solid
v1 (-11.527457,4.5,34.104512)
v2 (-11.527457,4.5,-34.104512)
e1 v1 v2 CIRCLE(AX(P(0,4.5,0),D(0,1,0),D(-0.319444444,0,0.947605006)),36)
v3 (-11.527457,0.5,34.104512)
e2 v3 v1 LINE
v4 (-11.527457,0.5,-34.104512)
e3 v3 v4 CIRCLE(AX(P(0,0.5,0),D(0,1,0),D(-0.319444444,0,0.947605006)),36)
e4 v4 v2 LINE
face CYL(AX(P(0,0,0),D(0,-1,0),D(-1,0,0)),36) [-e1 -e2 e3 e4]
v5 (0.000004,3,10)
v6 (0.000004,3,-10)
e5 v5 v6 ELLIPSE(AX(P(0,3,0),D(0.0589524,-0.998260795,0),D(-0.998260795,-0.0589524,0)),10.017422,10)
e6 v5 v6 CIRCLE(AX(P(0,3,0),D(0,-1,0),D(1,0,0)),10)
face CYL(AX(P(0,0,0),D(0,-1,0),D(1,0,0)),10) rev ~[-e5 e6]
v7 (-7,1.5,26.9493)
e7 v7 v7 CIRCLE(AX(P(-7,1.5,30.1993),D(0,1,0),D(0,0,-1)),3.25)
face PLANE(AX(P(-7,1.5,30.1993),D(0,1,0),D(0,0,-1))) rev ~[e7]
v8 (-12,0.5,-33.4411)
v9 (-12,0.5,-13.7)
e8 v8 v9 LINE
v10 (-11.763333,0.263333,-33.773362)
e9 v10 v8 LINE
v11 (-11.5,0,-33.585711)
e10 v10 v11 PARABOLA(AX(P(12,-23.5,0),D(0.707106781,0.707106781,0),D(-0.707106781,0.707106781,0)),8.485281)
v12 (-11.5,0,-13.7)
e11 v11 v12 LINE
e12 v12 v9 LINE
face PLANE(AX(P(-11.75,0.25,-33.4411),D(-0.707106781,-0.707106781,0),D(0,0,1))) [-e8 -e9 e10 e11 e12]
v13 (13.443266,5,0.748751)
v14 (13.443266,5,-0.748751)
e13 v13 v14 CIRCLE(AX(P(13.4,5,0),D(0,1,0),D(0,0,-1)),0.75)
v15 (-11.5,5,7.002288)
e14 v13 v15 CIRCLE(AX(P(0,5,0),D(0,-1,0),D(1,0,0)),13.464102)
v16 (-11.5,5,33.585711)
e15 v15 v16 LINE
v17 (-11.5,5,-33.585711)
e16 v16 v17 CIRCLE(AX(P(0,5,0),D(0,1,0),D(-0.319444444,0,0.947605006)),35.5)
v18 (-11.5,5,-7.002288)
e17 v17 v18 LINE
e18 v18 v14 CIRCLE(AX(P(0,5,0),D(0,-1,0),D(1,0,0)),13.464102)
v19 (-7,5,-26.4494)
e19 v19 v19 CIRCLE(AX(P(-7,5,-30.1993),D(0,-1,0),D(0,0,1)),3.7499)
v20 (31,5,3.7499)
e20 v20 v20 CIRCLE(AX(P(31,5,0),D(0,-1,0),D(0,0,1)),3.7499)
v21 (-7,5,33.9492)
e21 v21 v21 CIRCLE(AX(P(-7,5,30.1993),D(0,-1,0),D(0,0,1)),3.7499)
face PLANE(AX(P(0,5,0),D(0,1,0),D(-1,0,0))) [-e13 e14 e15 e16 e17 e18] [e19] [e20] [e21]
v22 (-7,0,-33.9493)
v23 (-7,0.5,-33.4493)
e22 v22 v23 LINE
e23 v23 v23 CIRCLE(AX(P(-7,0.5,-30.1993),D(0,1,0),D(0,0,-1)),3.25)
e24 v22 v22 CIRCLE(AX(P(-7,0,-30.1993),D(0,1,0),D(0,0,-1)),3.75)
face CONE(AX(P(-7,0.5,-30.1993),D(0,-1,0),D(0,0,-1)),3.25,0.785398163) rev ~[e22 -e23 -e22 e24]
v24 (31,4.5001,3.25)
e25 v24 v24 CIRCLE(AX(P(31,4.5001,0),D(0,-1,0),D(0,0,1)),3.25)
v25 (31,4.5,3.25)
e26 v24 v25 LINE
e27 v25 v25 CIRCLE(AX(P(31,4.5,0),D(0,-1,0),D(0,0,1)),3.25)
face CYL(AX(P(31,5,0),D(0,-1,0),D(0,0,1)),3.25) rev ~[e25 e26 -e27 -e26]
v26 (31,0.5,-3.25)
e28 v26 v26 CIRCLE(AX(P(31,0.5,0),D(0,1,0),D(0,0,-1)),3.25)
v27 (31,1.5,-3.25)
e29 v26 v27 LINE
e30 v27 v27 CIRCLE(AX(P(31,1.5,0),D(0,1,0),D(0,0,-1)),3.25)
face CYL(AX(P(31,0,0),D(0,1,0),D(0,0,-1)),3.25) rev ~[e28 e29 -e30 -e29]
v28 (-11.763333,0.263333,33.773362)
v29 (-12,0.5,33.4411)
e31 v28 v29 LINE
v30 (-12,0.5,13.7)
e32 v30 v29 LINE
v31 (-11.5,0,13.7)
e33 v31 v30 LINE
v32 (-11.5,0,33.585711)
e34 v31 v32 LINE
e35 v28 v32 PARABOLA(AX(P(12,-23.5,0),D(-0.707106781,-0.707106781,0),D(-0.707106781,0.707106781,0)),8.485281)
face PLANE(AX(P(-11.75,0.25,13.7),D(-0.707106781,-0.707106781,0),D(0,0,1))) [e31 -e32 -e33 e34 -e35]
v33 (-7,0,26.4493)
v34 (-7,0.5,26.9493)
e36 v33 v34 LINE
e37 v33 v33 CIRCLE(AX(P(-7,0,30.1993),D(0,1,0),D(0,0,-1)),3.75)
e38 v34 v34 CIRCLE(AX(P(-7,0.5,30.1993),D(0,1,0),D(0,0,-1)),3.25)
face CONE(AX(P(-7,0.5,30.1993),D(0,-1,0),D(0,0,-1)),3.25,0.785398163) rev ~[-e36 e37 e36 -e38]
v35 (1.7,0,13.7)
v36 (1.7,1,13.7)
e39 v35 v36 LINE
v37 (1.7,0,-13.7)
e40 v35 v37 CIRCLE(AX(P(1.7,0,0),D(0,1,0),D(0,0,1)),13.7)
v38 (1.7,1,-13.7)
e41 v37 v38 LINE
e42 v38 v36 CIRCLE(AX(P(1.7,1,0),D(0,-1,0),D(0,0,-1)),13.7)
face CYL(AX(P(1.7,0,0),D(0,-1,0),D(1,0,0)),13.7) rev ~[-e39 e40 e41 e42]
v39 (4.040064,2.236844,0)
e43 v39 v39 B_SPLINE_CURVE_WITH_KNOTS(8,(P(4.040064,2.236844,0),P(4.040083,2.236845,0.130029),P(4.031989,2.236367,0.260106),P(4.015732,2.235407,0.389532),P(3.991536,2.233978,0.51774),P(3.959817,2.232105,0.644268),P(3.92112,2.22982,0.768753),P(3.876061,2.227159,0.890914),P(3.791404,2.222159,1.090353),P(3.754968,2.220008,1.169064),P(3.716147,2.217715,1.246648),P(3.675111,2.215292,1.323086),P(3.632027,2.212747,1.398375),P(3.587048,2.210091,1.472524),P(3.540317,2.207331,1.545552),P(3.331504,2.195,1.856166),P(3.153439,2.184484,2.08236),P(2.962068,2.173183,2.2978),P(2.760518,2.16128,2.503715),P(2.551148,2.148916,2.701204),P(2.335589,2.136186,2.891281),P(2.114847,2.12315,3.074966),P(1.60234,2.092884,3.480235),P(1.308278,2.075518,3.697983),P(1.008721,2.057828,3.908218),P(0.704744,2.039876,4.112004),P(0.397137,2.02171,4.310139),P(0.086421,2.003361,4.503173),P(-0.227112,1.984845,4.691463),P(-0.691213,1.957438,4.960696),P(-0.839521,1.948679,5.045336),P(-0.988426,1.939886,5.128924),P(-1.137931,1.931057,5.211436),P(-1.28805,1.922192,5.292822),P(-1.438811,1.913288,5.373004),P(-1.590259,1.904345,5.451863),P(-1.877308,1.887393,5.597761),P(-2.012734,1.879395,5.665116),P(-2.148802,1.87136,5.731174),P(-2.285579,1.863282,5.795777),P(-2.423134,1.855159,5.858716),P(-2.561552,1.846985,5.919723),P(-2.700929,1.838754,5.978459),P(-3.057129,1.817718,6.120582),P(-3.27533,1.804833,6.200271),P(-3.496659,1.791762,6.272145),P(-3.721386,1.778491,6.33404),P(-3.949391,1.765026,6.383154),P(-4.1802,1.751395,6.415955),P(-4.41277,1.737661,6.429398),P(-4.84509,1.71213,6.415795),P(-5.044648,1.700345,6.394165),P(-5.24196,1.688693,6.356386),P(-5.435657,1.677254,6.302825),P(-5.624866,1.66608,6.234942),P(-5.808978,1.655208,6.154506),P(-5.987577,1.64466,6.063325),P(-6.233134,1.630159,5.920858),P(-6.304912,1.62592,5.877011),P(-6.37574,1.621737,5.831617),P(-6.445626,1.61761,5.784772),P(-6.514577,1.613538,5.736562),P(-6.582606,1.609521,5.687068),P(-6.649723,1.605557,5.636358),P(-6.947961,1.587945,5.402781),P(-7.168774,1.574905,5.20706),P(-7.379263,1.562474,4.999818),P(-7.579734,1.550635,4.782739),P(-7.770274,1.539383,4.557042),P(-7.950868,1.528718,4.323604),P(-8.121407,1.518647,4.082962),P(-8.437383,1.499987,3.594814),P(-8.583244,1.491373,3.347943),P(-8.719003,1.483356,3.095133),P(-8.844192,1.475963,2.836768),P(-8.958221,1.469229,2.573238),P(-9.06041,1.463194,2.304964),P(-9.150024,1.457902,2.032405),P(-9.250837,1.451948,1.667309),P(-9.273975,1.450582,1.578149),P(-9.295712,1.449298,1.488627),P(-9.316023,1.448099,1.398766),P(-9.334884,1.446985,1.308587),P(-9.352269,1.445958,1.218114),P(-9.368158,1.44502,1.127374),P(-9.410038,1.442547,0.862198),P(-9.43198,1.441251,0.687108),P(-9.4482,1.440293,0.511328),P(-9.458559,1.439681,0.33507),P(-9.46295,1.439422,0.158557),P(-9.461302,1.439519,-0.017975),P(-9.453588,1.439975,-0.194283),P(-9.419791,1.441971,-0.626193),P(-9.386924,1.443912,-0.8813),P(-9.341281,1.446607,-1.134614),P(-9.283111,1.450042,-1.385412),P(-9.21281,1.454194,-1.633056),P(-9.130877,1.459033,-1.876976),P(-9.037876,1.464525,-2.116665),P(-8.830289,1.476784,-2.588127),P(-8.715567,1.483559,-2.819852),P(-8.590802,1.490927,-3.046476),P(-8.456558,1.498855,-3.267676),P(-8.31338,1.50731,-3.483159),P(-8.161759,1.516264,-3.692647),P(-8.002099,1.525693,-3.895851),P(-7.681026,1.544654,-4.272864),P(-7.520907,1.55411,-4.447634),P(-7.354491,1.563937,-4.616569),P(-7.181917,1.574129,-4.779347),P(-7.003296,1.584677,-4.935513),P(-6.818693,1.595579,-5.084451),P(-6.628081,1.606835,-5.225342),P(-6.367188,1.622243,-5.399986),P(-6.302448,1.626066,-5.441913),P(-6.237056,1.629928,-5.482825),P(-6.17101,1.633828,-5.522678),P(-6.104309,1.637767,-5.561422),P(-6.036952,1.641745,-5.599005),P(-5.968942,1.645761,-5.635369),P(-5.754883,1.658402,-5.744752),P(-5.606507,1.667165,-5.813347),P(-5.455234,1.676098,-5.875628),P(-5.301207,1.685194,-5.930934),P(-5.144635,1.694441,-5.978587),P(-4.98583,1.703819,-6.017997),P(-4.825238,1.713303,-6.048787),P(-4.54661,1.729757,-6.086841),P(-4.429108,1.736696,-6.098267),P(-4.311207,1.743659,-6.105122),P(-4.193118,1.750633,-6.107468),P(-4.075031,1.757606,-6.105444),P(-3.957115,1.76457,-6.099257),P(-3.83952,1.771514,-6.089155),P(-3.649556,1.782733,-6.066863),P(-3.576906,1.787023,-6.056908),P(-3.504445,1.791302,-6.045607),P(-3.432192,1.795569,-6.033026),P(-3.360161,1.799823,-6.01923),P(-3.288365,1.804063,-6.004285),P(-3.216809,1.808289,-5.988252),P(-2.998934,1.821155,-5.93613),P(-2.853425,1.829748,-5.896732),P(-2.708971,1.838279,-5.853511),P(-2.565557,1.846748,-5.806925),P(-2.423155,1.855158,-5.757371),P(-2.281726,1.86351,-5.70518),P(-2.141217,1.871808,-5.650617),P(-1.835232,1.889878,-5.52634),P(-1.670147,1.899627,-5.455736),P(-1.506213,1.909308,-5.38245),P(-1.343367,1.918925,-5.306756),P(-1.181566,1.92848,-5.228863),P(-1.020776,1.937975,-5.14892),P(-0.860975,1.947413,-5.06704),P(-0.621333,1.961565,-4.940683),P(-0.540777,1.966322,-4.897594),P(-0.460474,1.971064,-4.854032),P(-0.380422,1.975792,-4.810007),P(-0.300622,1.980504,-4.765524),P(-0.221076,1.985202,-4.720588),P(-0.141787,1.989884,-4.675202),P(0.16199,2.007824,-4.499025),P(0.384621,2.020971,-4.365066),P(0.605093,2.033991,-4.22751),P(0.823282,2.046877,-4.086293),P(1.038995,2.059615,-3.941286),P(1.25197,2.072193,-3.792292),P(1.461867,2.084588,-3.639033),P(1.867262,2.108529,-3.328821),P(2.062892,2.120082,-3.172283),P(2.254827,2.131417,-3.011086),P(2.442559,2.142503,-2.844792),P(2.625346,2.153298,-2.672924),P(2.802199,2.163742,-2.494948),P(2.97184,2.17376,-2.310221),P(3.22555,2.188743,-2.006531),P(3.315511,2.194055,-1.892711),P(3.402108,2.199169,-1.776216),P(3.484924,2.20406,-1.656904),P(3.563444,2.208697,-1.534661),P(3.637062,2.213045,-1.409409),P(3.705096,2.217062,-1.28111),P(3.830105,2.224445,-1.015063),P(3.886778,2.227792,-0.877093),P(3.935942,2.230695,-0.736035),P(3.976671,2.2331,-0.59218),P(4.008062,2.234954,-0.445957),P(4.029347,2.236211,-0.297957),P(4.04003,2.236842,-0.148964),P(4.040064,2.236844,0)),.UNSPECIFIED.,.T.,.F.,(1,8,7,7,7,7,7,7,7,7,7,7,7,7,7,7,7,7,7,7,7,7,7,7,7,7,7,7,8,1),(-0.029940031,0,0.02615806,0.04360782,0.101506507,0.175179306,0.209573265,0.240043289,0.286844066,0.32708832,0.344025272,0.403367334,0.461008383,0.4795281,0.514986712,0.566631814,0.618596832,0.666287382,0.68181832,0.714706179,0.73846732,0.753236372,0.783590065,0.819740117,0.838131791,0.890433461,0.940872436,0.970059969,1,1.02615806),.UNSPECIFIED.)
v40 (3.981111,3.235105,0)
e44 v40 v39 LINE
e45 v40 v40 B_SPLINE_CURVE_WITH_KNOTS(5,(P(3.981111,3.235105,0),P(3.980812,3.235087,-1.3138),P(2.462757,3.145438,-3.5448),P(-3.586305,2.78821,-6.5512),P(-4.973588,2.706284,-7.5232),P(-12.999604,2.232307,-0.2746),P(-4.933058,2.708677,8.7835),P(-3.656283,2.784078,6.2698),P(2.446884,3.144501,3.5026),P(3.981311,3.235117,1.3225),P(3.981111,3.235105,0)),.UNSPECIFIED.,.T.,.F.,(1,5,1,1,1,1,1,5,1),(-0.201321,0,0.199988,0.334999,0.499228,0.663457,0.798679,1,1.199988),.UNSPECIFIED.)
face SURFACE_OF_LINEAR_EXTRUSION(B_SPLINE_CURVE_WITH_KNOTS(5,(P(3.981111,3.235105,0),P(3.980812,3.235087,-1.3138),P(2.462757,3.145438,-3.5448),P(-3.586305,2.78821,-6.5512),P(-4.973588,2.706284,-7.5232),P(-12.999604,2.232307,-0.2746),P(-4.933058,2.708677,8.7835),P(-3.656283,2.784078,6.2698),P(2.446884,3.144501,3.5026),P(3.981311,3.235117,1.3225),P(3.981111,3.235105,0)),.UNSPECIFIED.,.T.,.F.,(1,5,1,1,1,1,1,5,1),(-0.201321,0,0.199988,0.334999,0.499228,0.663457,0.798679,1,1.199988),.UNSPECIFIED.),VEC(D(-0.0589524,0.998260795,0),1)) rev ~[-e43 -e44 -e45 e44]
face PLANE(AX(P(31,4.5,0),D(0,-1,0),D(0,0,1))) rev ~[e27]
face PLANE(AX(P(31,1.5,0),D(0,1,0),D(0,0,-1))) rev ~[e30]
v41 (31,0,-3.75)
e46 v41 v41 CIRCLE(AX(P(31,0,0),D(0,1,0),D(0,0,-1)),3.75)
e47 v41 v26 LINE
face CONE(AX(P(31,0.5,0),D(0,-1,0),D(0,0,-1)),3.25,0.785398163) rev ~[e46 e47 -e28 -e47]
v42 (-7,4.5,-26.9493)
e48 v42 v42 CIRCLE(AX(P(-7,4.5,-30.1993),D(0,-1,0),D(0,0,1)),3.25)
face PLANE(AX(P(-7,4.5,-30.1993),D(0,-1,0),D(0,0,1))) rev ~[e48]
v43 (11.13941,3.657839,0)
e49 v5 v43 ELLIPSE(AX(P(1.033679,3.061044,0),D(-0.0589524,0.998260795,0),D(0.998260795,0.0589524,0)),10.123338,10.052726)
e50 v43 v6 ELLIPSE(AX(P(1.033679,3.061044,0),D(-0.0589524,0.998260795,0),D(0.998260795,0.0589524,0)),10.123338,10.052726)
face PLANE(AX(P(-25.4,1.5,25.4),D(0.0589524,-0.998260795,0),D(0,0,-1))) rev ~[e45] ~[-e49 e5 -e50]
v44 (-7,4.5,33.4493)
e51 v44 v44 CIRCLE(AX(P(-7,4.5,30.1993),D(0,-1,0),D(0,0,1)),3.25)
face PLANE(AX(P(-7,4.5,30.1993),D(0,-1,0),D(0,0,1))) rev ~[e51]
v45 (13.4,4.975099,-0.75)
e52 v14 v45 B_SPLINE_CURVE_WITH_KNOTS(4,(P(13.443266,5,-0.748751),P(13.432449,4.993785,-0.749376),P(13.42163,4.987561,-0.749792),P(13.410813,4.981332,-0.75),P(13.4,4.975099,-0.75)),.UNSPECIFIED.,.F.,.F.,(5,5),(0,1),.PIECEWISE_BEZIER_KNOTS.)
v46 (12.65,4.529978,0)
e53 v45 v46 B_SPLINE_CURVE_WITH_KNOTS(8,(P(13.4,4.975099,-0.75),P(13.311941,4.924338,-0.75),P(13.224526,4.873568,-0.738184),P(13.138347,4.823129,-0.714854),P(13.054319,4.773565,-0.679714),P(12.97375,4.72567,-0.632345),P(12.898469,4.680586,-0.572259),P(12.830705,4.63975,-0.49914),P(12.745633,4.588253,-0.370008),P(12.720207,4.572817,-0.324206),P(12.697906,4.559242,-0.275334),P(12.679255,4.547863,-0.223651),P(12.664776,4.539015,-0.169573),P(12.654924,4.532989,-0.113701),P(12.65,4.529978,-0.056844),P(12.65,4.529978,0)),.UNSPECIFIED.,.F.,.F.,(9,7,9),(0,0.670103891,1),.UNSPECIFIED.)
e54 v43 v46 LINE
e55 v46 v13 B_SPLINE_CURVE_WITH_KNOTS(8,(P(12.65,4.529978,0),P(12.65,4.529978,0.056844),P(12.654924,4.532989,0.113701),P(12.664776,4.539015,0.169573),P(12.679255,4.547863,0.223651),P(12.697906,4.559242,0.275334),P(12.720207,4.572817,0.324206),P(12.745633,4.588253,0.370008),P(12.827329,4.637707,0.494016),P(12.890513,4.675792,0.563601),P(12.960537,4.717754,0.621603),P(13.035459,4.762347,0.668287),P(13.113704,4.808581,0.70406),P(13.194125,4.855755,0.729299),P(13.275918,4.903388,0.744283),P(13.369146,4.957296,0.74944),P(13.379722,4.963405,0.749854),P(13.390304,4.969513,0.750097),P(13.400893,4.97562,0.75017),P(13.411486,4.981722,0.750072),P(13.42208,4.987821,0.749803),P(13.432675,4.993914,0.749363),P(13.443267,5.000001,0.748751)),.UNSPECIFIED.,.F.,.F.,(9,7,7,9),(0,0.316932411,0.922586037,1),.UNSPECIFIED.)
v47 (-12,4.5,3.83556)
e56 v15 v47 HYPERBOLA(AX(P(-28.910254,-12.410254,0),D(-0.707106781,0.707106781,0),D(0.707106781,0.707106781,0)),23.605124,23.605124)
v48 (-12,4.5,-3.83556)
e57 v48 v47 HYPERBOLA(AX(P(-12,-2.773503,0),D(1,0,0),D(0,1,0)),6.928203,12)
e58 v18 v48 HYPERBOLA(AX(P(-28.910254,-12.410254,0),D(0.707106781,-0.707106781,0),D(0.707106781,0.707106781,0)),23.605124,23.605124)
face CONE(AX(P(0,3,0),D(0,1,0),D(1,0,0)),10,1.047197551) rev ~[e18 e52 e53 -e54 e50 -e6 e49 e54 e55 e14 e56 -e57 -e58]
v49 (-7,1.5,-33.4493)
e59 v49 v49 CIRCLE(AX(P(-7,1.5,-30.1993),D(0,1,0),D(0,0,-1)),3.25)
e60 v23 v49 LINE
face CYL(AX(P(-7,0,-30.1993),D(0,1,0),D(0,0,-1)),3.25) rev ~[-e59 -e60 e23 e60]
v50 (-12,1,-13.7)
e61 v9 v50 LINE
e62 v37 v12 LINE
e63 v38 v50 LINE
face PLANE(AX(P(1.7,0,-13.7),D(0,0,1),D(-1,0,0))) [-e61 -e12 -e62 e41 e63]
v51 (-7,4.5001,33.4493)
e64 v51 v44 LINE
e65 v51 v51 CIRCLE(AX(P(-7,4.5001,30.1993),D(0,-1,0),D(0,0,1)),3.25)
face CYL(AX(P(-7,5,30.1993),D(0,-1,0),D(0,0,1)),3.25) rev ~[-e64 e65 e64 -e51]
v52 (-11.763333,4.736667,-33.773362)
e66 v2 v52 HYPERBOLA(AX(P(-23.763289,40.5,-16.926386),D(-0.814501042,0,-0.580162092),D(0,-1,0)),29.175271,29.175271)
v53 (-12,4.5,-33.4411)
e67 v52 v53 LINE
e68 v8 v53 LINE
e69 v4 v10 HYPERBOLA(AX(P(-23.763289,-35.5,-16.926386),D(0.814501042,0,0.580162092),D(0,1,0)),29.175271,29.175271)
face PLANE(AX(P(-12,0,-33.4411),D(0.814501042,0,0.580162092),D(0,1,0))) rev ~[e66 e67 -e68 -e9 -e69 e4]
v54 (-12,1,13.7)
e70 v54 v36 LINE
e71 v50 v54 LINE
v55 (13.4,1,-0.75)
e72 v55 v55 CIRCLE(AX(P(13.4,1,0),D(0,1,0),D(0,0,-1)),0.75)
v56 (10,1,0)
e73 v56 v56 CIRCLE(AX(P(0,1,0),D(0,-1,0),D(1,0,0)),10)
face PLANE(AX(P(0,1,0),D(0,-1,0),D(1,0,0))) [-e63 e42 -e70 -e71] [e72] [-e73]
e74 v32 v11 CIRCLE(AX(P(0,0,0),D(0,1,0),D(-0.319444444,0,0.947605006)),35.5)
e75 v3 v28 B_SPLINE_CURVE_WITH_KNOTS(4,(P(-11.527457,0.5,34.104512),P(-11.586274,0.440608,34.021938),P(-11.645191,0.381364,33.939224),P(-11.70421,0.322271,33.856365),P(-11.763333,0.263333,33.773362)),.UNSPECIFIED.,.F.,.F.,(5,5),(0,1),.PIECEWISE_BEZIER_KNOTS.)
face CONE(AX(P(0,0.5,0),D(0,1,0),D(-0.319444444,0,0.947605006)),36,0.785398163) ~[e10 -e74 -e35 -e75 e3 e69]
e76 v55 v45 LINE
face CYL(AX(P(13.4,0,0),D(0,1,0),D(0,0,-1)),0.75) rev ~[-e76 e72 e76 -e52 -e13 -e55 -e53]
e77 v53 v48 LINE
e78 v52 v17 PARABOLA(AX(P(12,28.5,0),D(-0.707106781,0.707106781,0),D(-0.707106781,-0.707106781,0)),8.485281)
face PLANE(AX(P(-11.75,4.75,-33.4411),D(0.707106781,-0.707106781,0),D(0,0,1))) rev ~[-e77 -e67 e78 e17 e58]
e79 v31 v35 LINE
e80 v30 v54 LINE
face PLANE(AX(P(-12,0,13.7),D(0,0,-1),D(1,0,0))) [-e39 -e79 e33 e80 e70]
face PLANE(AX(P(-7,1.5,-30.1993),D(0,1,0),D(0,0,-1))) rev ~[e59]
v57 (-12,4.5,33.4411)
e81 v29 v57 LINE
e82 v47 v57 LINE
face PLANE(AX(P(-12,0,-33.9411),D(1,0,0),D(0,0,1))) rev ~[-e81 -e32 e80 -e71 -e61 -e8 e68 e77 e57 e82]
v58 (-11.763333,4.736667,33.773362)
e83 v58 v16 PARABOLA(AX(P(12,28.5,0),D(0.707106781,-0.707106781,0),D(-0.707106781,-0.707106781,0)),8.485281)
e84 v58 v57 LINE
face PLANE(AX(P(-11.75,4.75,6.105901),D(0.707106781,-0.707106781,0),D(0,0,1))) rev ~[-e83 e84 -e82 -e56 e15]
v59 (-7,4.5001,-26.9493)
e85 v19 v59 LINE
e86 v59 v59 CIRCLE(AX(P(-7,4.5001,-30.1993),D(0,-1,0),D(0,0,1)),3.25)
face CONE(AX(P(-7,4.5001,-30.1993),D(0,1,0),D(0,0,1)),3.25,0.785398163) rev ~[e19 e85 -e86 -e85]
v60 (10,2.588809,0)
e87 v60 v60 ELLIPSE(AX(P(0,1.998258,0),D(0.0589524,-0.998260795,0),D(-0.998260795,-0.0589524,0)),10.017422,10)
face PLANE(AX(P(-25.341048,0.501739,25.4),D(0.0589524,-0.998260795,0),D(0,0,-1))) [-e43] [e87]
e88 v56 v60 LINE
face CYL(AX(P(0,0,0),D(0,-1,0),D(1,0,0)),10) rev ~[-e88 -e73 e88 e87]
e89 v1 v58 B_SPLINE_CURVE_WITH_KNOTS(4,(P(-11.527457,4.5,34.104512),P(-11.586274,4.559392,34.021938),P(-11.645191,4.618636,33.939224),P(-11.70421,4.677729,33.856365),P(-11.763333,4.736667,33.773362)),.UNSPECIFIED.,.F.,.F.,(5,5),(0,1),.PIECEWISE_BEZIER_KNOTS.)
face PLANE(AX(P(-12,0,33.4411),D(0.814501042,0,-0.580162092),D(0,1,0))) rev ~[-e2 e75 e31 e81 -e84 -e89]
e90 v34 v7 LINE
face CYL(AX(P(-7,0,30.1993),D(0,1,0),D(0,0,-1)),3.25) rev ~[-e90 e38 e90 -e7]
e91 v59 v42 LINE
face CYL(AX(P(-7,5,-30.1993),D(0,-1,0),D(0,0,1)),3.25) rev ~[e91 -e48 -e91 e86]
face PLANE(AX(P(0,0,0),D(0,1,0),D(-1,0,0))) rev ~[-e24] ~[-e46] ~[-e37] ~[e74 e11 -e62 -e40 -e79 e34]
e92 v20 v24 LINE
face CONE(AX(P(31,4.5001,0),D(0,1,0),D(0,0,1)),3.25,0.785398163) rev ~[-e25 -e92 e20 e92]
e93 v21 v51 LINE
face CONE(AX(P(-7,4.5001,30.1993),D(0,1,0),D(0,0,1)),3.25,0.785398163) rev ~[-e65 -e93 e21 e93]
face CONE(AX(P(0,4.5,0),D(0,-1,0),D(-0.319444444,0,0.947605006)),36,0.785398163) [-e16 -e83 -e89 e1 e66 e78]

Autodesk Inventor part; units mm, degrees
ref_plane "YZ Plane" through (0, 0, 0) normal (1, 0, 0) x (0, 1, 0)
ref_plane "Bottom Plane for Slope" through (0, 1.5, 0) normal (0, 1, 0) x (-1, 0, 0)
sketch "Bottom Plane" plane through (0, 1.5, 0) normal (0, 1, 0) x (-1, 0, 0)
  line L0 (-25.4, 25.4) -> (25.4, 25.4)
  line L1 (25.4, 25.4) -> (25.4, -25.4)
  line L2 (25.4, -25.4) -> (-25.4, -25.4)
  line L3 (-25.4, -25.4) -> (-25.4, 25.4)
  line L4 (-25.4, 25.4) -> (25.4, -25.4) construction
  line L5 (25.4, 25.4) -> (-25.4, -25.4) construction
  point P0 (0, 0)
  dimension "d26" = 50.8
  dimension "d27" = 50.8
ref_plane "Top Plane for Slope" through (0, 4.5, 0) normal (0, 1, 0) x (-1, 0, 0)
sketch "Top Plane" plane through (0, 4.5, 0) normal (0, 1, 0) x (-1, 0, 0)
  line L0 (-25.4, 25.4) -> (25.4, 25.4)
  line L1 (25.4, 25.4) -> (25.4, -25.4)
  line L2 (25.4, -25.4) -> (-25.4, -25.4)
  line L3 (-25.4, -25.4) -> (-25.4, 25.4)
  line L4 (-25.4, 25.4) -> (25.4, -25.4) construction
  line L5 (25.4, 25.4) -> (-25.4, -25.4) construction
  point P0 (0, 0)
  dimension "d28" = 50.8
  dimension "d29" = 50.8
ref_plane "Slope Plane" through (-25.4, 1.5, 25.4) normal (0.0589524, -0.9982608, 0) x (0, 0, -1)
sketch "master" plane through (0, 0, 0) normal (0, 1, 0) x (-1, 0, 0)
  circle A0 centre (0, 0) radius 36
  line L0 (0, 36) -> (0, -36) construction
  line L1 (12, -33.9411) -> (12, 33.9411)
  circle A1 centre (0, 0) radius 10 construction
  line L2 (10, 0) -> (12, 0) construction
  circle A2 centre (-1.7, 0) radius 13.7 construction
  line L3 (-36, 0) -> (12, 0) construction
  circle A3 centre (0, 0) radius 31 construction
  line L4 (7, -35.3129) -> (7, 35.3129) construction
  line L5 (0, 0) -> (-23.1404, -27.5776) construction
  line L6 (0, 0) -> (-23.1404, 27.5776) construction
  circle A4 centre (-1.7, 0) radius 11.7 construction
  line L7 (-1.7, -13.7) -> (-1.7, 13.7) construction
  line L8 (-1.7, -13.7) -> (12, -13.7) construction
  line L9 (-1.7, 13.7) -> (12, 13.7) construction
  point P0 (7, -30.1993)
  point P1 (7, 30.1993)
  point P2 (-19.9264, -23.7474)
  point P3 (-19.9264, 23.7474)
  point P4 (-31, 0)
  point P5 (0, -11.5758)
  point P6 (0, 11.5758)
  point P7 (-13.4, 0)
  dimension "d0" = 72
  dimension "d2" = 20
  dimension "d1" = 2
  dimension "d6" = 27.4
  dimension "d7" = 5
  dimension "d8" = 5
  dimension "d9" = 50
  dimension "d10" = 50
  dimension "d11" = 2
extrude "Main Platform" add sketch "master" along normal blind 5 contours L1 A0 picked at (-3.9243, -1.3458)
sketch "Sketch3" plane through (0, 0, 0) normal (0, -1, 0) x (1, 0, 0)
  circle A0 centre (0, 0) radius 10 construction
  circle A1 centre (0, 0) radius 10
extrude "Main Hole" cut sketch "Sketch3" against normal blind 5
sketch "Sketch4" plane through (0, 0, 0) normal (0, -1, 0) x (1, 0, 0)
  circle A0 centre (1.7, 0) radius 13.7 construction
  circle A1 centre (1.7, 0) radius 13.7
  line L0 (1.7, 13.7) -> (-12, 13.7) construction
  line L1 (1.7, -13.7) -> (-12, -13.7) construction
  line L2 (-12, 13.7) -> (1.7, 13.7)
  line L3 (1.7, 13.7) -> (1.7, -13.7)
  line L4 (1.7, -13.7) -> (-12, -13.7)
  line L5 (-12, -13.7) -> (-12, 13.7)
  point P0 (0, 0)
extrude "Window Recess" cut sketch "Sketch4" against normal blind 1
sketch "Sketch5" plane through (0, 0, 0) normal (0, -1, 0) x (1, 0, 0)
  point P0 (0, 0)
  point P1 (13.4, 0)
hole "Window Removal Holes" at (13.4, 0, 0) direction (0, 1, 0) diameter 1.5 end through all
sketch "Sketch10" plane through (-25.4, 1.5, 25.4) normal (0.0589524, -0.9982608, 0) x (0, 0, -1)
  ellipse E0 centre (25.4, 27.0234) end of major axis (11.7, 27.0234) minor radius 13.6762 (39.1, 27.0234) -> (11.7, 27.0234) ccw construction
  line L0 (11.7, 13.3472) -> (11.7, 27.0234) construction
  line L1 (39.1, 27.0234) -> (39.1, 13.3472) construction
  ellipse E1 centre (25.4, 25.5622) end of major axis (35.4, 25.5622) minor radius 9.9826 construction
  line L2 (59.3411, 13.583) -> (-8.5411, 13.583) construction
  line L3 (39.1, 26.9644) -> (39.1, 13.2883) projected
  line L4 (39.1, 14.351) -> (11.7, 14.351)
  line L5 (11.7, 14.351) -> (11.7, 35.7061)
  line L6 (11.7, 35.7061) -> (39.1, 35.7061)
  line L7 (39.1, 35.7061) -> (39.1, 14.351)
  point P0 (25.4, 25.2674)
extrude "Slope" add sketch "Sketch10" along normal blind 1
sketch "Sketch14" plane through (0, 0, 0) normal (0, -1, 0) x (1, 0, 0)
  point P0 (0, 0)
  point P1 (-7, 30.1993)
  point P2 (31, 0)
  point P3 (-7, -30.1993)
chamfer "Chamfer1" distance 2 angle 60 1 edges at (-10, 5, 0)
sketch "Sketch17" plane through (-25.4, 1.5, 25.4) normal (0.0589524, -0.9982608, 0) x (0, 0, -1)
  ellipse E0 centre (25.4, 25.4443) end of major axis (25.4, 15.4268) minor radius 10 (15.4, 25.4443) -> (35.4, 25.4443) ccw construction
  ellipse E1 centre (25.4, 26.4797) end of major axis (25.4, 36.6031) minor radius 10.0527 (35.4, 25.4443) -> (15.4, 25.4443) ccw construction
  ellipse E2 centre (25.4, 25.3852) end of major axis (25.4, 15.3678) minor radius 10 construction
  ellipse E3 centre (25.4, 25.4443) end of major axis (35.4, 25.4443) minor radius 9.9826 (15.4, 25.4443) -> (35.4, 25.4443) ccw construction
  line L0 (25.4, 35.4026) -> (32.7708, 19.5959) construction
  line L1 (25.4, 35.4026) -> (18.0292, 19.5959) construction
  line L2 (25.4, 35.4026) -> (25.4, 19.5959) construction
  line L3 (32.7708, 19.5959) -> (18.0292, 19.5959) construction
  line L4 (28.184, 29.4323) -> (22.616, 29.4323) construction
  line L5 (58.9857, 14.0822) -> (-8.1857, 14.0822) construction
  line L6 (-8.1857, 14.0822) -> (-8.1857, 35.4026) construction
  line L7 (-8.1857, 35.4026) -> (58.9857, 35.4026) construction
  line L8 (58.9857, 35.4026) -> (58.9857, 14.0822) construction
  spline S0 degree 5 poles (25.4, 29.4323) (26.7138, 29.432) (28.9448, 27.9113) (31.9512, 21.8517) (32.9232, 20.462) (25.6746, 12.422) (16.6165, 20.5026) (19.1302, 21.7816) (21.8974, 27.8954) (24.0775, 29.4325) (25.4, 29.4323) knots 0 0 0 0 0 0 0.199988 0.334999 0.499228 0.663457 0.798679 1 1 1 1 1 1
  line L9 (30.5619, 24.333) -> (20.2381, 24.333) construction
  line L10 (25.4, 19.5959) -> (25.4, 13.3472) construction
  line L11 (39.1, 13.3472) -> (11.7, 13.3472) projected
  point P0 (25.4, 25.2674)
  point P1 (25.4, 15.9117)
  point P2 (19.2424, 19.5959)
  dimension "d81" = 25
  dimension "d82" = 25
extrude "Extrusion6" cut sketch "Sketch17" along normal through all
sketch "Sketch15" plane through (0, 5, 0) normal (0, 1, 0) x (1, 0, 0)
  point P0 (0, 0)
  point P1 (31, 0)
  point P2 (-7, -30.1993)
  point P3 (-7, 30.1993)
hole "Top Magnet Holes" at (-7, 5, -30.1993) at (31, 5, 0) at (-7, 5, 30.1993) direction (0, -1, 0) diameter 6.5 depth 0.5
hole "Bottom Magnet Holes" at (-7, 0, 30.1993) at (31, 0, 0) at (-7, 0, -30.1993) direction (0, 1, 0) diameter 6.5 depth 1.5
chamfer "Chamfer7" distance 0.5 angle 45 1 edges at (-12, 2.5, 33.9411)
chamfer "Chamfer8" distance 0.5 angle 45 1 edges at (-12, 2.5, -33.9411)
chamfer "Chamfer9" distance 0.5 angle 45 1 edges at (-12, 5, -19.7735)
chamfer "Chamfer10" distance 0.5 angle 45 1 edges at (-12, 5, 19.7735)
chamfer "Chamfer11" distance 0.5 angle 45 1 edges at (-12, 0, 23.5706)
chamfer "Chamfer12" distance 0.5 angle 45 1 edges at (-12, 0, -23.5706)
chamfer "Chamfer13" distance 0.5 angle 45 1 edges at (36, 5, 0)
chamfer "Chamfer14" distance 0.5 angle 45 1 edges at (36, 0, 0)
chamfer "Chamfer15" distance 0.5 angle 45 1 edges at (-7, 5, -33.4493)
chamfer "Chamfer16" distance 0.5 angle 45 1 edges at (31, 5, -3.25)
chamfer "Chamfer17" distance 0.5 angle 45 1 edges at (-7, 5, 26.9493)
chamfer "Chamfer18" distance 0.5 angle 45 1 edges at (-7, 0, 33.4493)
chamfer "Chamfer19" distance 0.5 angle 45 1 edges at (31, 0, 3.25)
chamfer "Chamfer20" distance 0.5 angle 45 1 edges at (-7, 0, -26.9493)
properties part number "holder"
